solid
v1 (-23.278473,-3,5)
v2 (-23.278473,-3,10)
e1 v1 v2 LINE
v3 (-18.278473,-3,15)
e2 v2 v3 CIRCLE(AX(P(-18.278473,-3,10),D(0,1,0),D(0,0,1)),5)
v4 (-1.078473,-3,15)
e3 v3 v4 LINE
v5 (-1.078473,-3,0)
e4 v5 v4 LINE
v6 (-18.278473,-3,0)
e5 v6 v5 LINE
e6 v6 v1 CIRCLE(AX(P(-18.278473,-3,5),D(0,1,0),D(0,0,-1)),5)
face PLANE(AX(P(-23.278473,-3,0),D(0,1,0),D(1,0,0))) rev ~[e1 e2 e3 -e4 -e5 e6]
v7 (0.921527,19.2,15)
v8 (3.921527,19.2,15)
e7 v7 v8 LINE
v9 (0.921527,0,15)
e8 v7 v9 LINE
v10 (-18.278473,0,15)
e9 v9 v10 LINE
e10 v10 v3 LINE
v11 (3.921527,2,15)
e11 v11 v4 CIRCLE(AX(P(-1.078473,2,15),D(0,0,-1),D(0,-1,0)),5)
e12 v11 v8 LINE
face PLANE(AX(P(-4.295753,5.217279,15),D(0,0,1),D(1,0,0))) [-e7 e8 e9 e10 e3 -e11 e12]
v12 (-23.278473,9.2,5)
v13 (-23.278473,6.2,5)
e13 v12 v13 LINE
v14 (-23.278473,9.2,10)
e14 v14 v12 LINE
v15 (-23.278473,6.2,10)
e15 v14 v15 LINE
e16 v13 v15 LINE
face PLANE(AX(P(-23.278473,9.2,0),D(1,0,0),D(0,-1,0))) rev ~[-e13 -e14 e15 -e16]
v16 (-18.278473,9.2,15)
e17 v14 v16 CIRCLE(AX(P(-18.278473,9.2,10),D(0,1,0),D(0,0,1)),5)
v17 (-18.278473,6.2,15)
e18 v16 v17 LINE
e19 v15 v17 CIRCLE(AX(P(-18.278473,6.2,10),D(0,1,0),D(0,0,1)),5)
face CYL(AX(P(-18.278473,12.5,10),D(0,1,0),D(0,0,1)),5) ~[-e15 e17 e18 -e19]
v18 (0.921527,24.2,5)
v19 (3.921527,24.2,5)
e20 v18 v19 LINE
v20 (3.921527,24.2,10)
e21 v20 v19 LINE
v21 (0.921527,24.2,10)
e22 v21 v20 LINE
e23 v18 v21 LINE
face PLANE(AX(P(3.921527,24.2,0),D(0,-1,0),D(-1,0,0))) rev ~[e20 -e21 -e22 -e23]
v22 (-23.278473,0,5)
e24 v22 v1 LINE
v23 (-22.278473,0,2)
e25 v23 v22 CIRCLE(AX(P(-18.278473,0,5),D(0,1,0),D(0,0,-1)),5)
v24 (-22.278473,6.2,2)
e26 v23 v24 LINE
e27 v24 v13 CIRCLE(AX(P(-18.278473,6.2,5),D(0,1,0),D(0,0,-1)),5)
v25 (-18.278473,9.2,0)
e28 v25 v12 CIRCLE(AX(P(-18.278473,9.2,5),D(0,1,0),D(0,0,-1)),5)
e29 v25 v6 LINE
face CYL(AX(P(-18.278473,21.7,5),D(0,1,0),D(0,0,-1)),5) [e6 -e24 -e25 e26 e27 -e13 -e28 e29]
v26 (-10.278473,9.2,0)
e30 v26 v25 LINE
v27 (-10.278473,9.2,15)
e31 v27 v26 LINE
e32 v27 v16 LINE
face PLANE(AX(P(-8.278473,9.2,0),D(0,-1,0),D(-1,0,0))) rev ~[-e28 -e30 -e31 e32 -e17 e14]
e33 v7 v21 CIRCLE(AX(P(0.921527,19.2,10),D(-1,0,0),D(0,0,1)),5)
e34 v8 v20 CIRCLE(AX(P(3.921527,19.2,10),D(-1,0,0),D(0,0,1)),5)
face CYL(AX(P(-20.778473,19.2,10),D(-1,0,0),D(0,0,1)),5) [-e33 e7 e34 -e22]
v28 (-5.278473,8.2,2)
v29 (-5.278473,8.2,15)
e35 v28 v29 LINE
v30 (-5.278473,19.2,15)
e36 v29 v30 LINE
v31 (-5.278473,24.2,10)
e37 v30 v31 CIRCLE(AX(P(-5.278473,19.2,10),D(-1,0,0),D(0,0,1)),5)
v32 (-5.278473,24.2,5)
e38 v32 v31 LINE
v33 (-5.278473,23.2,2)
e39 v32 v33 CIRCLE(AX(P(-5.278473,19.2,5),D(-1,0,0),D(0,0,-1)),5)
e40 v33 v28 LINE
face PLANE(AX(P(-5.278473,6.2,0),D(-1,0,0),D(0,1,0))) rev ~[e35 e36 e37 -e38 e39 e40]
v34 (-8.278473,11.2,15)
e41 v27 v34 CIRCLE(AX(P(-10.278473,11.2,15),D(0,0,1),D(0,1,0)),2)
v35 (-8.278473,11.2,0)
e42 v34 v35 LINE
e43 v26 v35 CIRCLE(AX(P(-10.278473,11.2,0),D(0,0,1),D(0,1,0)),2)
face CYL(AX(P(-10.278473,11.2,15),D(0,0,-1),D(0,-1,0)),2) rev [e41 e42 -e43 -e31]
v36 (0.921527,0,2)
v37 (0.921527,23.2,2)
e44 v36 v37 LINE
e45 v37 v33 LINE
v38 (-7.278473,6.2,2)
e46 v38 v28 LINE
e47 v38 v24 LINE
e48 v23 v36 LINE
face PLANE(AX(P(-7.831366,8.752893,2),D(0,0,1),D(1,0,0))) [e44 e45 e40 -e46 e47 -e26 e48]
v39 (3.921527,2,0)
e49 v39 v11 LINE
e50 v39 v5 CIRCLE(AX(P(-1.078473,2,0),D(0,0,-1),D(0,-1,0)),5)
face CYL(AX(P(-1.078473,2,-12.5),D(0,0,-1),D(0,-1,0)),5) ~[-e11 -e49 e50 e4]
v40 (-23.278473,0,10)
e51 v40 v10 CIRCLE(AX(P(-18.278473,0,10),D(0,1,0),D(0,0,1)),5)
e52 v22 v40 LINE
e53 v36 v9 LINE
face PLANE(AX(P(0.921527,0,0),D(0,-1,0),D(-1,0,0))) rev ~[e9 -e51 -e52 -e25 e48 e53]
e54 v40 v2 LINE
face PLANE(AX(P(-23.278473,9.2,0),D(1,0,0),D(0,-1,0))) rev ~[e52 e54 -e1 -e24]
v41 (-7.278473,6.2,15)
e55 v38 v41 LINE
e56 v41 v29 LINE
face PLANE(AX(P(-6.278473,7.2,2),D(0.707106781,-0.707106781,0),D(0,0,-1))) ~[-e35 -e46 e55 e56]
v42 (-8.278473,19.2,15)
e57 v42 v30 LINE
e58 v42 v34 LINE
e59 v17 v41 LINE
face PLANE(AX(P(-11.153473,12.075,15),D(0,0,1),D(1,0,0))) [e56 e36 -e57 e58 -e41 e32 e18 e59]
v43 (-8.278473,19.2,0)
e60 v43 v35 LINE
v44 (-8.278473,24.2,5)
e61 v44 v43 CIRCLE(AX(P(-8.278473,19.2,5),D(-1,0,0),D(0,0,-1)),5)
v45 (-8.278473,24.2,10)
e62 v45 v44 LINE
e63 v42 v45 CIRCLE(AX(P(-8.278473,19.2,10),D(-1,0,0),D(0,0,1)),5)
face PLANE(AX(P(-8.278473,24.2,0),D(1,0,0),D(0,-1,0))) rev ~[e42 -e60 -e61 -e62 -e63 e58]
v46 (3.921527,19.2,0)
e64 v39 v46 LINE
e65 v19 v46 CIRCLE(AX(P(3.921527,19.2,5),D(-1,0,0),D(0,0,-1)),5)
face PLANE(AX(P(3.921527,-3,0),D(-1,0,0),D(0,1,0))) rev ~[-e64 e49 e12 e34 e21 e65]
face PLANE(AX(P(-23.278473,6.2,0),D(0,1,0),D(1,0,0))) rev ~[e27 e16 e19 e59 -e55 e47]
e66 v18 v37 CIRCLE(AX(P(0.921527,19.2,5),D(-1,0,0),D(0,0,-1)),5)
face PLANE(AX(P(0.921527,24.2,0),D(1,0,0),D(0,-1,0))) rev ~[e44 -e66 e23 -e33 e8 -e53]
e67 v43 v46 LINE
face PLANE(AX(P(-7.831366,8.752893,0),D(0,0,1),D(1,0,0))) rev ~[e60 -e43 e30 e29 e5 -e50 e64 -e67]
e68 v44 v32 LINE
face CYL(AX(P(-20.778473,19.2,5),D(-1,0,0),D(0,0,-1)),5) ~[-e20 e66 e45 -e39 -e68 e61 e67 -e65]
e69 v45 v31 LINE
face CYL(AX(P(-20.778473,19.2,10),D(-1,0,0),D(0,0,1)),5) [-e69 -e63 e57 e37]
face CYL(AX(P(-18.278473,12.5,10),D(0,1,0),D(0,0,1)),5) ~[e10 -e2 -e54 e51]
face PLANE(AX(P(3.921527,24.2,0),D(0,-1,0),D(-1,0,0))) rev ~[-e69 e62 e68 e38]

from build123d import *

# Parameters (mm, degrees)
F1_DEPTH     = 2
F2_DEPTH     = 15
F3_T1_DEPTH  = 28
F3_T3_DEPTH  = 28
F3_T5_DEPTH  = 28
F3_T7_DEPTH  = 28
F3_T9_DEPTH  = 37.2
F3_T11_DEPTH = 37.2
F3_T13_DEPTH = 40
F4_R         = 2
F5_SIZE      = 2


# Not quite as in the source:
# - a fillet or chamfer that OpenCascade refuses, or shapes differently, is made with other operations: its cross-section is extruded or revolved along the edge and cut away or added
# - a feature names something its author has since deleted; it is built from what else it names


with BuildPart() as f1:
    # F0 (on Top) → F1 (new body)
    with BuildSketch(Plane.XY):
        Polygon((0.9215265818, 0), (0.9215265818, 6.2), (0.9215265818, 24.2), (-5.2784734182, 24.2), (-5.2784734182, 6.2), (-23.2784734182, 6.2), (-23.2784734182, 0), (0, 0), align=None)
        Polygon((0.9215265818, 24.2), (0.9215265818, 6.2), (0.9215265818, 0), (0, 0), (-23.2784734182, 0), (-23.2784734182, -3), (0, -3), (3.9215265818, -3), (3.9215265818, 24.2), align=None)
        Polygon((-5.2784734182, 6.2), (-5.2784734182, 24.2), (-8.2784734182, 24.2), (-8.2784734182, 9.2), (-23.2784734182, 9.2), (-23.2784734182, 6.2), align=None)
    extrude(amount=F1_DEPTH)

    # F0 (on Top) → F2 (join)
    with BuildSketch(Plane.XY):
        Polygon((-5.2784734182, 6.2), (-5.2784734182, 24.2), (-8.2784734182, 24.2), (-8.2784734182, 9.2), (-23.2784734182, 9.2), (-23.2784734182, 6.2), align=None)
        Polygon((0.9215265818, 24.2), (0.9215265818, 6.2), (0.9215265818, 0), (0, 0), (-23.2784734182, 0), (-23.2784734182, -3), (0, -3), (3.9215265818, -3), (3.9215265818, 24.2), align=None)
    extrude(amount=F2_DEPTH)

    # F3: fillet of radius 5 on 7 edges, made by hand

    # F3_s2 → F3_t1 (cut)
    with BuildSketch(Plane.XZ.offset(-12.5)):
        with BuildLine():
            ThreePointArc((-18.2784734182, 15), (-21.8140073241, 13.5355339059), (-23.2784734182, 10))
            Line((-23.2784734182, 10), (-23.2784734182, 15))
            Line((-23.2784734182, 15), (-18.2784734182, 15))
        make_face()
    extrude(amount=F3_T1_DEPTH, mode=Mode.SUBTRACT)

    # F3_s4 → F3_t3 (cut)
    with BuildSketch(Plane.XZ.offset(-21.7)):
        with BuildLine():
            ThreePointArc((-18.2784734182, 15), (-21.8140073241, 13.5355339059), (-23.2784734182, 10))
            Line((-23.2784734182, 10), (-23.2784734182, 15))
            Line((-23.2784734182, 15), (-18.2784734182, 15))
        make_face()
    extrude(amount=F3_T3_DEPTH, mode=Mode.SUBTRACT)

    # F3_s6 → F3_t5 (cut)
    with BuildSketch(Plane.YZ.offset(-20.7784734182)):
        with BuildLine():
            ThreePointArc((19.2, 15), (22.7355339059, 13.5355339059), (24.2, 10))
            Line((24.2, 10), (24.2, 15))
            Line((24.2, 15), (19.2, 15))
        make_face()
    extrude(amount=F3_T5_DEPTH, mode=Mode.SUBTRACT)

    # F3_s8 → F3_t7 (cut)
    with BuildSketch(Plane.YZ.offset(-11.5784734182)):
        with BuildLine():
            ThreePointArc((24.2, 10), (22.7355339059, 13.5355339059), (19.2, 15))
            Line((19.2, 15), (24.2, 15))
            Line((24.2, 15), (24.2, 10))
        make_face()
    extrude(amount=F3_T7_DEPTH, mode=Mode.SUBTRACT)

    # F3_s10 → F3_t9 (cut)
    with BuildSketch(Plane.XZ.offset(-21.7)):
        with BuildLine():
            ThreePointArc((-18.2784734182, 0), (-21.8140073241, 1.4644660941), (-23.2784734182, 5))
            Line((-23.2784734182, 5), (-23.2784734182, 0))
            Line((-23.2784734182, 0), (-18.2784734182, 0))
        make_face()
    extrude(amount=F3_T9_DEPTH, mode=Mode.SUBTRACT)

    # F3_s12 → F3_t11 (cut)
    with BuildSketch(Plane.YZ.offset(-20.7784734182)):
        with BuildLine():
            ThreePointArc((19.2, 0), (22.7355339059, 1.4644660941), (24.2, 5))
            Line((24.2, 5), (24.2, 0))
            Line((24.2, 0), (19.2, 0))
        make_face()
    extrude(amount=F3_T11_DEPTH, mode=Mode.SUBTRACT)

    # F3_s14 → F3_t13 (cut)
    with BuildSketch(Plane.XY.offset(-12.5)):
        with BuildLine():
            ThreePointArc((-1.0784734182, -3), (2.4570604877, -1.5355339059), (3.9215265818, 2))
            Line((3.9215265818, 2), (3.9215265818, -3))
            Line((3.9215265818, -3), (-1.0784734182, -3))
        make_face()
    extrude(amount=F3_T13_DEPTH, mode=Mode.SUBTRACT)

    # F4
    f4_edges = [f1.edges().sort_by_distance(p)[0] for p in [
        (-8.278473, 9.2, 7.5),
    ]]
    fillet(f4_edges, radius=F4_R)

    # F5
    f5_edges = [f1.edges().sort_by_distance(p)[0] for p in [
        (-5.278473, 6.2, 8.5),
    ]]
    chamfer(f5_edges, length=F5_SIZE)


solid = f1.part
